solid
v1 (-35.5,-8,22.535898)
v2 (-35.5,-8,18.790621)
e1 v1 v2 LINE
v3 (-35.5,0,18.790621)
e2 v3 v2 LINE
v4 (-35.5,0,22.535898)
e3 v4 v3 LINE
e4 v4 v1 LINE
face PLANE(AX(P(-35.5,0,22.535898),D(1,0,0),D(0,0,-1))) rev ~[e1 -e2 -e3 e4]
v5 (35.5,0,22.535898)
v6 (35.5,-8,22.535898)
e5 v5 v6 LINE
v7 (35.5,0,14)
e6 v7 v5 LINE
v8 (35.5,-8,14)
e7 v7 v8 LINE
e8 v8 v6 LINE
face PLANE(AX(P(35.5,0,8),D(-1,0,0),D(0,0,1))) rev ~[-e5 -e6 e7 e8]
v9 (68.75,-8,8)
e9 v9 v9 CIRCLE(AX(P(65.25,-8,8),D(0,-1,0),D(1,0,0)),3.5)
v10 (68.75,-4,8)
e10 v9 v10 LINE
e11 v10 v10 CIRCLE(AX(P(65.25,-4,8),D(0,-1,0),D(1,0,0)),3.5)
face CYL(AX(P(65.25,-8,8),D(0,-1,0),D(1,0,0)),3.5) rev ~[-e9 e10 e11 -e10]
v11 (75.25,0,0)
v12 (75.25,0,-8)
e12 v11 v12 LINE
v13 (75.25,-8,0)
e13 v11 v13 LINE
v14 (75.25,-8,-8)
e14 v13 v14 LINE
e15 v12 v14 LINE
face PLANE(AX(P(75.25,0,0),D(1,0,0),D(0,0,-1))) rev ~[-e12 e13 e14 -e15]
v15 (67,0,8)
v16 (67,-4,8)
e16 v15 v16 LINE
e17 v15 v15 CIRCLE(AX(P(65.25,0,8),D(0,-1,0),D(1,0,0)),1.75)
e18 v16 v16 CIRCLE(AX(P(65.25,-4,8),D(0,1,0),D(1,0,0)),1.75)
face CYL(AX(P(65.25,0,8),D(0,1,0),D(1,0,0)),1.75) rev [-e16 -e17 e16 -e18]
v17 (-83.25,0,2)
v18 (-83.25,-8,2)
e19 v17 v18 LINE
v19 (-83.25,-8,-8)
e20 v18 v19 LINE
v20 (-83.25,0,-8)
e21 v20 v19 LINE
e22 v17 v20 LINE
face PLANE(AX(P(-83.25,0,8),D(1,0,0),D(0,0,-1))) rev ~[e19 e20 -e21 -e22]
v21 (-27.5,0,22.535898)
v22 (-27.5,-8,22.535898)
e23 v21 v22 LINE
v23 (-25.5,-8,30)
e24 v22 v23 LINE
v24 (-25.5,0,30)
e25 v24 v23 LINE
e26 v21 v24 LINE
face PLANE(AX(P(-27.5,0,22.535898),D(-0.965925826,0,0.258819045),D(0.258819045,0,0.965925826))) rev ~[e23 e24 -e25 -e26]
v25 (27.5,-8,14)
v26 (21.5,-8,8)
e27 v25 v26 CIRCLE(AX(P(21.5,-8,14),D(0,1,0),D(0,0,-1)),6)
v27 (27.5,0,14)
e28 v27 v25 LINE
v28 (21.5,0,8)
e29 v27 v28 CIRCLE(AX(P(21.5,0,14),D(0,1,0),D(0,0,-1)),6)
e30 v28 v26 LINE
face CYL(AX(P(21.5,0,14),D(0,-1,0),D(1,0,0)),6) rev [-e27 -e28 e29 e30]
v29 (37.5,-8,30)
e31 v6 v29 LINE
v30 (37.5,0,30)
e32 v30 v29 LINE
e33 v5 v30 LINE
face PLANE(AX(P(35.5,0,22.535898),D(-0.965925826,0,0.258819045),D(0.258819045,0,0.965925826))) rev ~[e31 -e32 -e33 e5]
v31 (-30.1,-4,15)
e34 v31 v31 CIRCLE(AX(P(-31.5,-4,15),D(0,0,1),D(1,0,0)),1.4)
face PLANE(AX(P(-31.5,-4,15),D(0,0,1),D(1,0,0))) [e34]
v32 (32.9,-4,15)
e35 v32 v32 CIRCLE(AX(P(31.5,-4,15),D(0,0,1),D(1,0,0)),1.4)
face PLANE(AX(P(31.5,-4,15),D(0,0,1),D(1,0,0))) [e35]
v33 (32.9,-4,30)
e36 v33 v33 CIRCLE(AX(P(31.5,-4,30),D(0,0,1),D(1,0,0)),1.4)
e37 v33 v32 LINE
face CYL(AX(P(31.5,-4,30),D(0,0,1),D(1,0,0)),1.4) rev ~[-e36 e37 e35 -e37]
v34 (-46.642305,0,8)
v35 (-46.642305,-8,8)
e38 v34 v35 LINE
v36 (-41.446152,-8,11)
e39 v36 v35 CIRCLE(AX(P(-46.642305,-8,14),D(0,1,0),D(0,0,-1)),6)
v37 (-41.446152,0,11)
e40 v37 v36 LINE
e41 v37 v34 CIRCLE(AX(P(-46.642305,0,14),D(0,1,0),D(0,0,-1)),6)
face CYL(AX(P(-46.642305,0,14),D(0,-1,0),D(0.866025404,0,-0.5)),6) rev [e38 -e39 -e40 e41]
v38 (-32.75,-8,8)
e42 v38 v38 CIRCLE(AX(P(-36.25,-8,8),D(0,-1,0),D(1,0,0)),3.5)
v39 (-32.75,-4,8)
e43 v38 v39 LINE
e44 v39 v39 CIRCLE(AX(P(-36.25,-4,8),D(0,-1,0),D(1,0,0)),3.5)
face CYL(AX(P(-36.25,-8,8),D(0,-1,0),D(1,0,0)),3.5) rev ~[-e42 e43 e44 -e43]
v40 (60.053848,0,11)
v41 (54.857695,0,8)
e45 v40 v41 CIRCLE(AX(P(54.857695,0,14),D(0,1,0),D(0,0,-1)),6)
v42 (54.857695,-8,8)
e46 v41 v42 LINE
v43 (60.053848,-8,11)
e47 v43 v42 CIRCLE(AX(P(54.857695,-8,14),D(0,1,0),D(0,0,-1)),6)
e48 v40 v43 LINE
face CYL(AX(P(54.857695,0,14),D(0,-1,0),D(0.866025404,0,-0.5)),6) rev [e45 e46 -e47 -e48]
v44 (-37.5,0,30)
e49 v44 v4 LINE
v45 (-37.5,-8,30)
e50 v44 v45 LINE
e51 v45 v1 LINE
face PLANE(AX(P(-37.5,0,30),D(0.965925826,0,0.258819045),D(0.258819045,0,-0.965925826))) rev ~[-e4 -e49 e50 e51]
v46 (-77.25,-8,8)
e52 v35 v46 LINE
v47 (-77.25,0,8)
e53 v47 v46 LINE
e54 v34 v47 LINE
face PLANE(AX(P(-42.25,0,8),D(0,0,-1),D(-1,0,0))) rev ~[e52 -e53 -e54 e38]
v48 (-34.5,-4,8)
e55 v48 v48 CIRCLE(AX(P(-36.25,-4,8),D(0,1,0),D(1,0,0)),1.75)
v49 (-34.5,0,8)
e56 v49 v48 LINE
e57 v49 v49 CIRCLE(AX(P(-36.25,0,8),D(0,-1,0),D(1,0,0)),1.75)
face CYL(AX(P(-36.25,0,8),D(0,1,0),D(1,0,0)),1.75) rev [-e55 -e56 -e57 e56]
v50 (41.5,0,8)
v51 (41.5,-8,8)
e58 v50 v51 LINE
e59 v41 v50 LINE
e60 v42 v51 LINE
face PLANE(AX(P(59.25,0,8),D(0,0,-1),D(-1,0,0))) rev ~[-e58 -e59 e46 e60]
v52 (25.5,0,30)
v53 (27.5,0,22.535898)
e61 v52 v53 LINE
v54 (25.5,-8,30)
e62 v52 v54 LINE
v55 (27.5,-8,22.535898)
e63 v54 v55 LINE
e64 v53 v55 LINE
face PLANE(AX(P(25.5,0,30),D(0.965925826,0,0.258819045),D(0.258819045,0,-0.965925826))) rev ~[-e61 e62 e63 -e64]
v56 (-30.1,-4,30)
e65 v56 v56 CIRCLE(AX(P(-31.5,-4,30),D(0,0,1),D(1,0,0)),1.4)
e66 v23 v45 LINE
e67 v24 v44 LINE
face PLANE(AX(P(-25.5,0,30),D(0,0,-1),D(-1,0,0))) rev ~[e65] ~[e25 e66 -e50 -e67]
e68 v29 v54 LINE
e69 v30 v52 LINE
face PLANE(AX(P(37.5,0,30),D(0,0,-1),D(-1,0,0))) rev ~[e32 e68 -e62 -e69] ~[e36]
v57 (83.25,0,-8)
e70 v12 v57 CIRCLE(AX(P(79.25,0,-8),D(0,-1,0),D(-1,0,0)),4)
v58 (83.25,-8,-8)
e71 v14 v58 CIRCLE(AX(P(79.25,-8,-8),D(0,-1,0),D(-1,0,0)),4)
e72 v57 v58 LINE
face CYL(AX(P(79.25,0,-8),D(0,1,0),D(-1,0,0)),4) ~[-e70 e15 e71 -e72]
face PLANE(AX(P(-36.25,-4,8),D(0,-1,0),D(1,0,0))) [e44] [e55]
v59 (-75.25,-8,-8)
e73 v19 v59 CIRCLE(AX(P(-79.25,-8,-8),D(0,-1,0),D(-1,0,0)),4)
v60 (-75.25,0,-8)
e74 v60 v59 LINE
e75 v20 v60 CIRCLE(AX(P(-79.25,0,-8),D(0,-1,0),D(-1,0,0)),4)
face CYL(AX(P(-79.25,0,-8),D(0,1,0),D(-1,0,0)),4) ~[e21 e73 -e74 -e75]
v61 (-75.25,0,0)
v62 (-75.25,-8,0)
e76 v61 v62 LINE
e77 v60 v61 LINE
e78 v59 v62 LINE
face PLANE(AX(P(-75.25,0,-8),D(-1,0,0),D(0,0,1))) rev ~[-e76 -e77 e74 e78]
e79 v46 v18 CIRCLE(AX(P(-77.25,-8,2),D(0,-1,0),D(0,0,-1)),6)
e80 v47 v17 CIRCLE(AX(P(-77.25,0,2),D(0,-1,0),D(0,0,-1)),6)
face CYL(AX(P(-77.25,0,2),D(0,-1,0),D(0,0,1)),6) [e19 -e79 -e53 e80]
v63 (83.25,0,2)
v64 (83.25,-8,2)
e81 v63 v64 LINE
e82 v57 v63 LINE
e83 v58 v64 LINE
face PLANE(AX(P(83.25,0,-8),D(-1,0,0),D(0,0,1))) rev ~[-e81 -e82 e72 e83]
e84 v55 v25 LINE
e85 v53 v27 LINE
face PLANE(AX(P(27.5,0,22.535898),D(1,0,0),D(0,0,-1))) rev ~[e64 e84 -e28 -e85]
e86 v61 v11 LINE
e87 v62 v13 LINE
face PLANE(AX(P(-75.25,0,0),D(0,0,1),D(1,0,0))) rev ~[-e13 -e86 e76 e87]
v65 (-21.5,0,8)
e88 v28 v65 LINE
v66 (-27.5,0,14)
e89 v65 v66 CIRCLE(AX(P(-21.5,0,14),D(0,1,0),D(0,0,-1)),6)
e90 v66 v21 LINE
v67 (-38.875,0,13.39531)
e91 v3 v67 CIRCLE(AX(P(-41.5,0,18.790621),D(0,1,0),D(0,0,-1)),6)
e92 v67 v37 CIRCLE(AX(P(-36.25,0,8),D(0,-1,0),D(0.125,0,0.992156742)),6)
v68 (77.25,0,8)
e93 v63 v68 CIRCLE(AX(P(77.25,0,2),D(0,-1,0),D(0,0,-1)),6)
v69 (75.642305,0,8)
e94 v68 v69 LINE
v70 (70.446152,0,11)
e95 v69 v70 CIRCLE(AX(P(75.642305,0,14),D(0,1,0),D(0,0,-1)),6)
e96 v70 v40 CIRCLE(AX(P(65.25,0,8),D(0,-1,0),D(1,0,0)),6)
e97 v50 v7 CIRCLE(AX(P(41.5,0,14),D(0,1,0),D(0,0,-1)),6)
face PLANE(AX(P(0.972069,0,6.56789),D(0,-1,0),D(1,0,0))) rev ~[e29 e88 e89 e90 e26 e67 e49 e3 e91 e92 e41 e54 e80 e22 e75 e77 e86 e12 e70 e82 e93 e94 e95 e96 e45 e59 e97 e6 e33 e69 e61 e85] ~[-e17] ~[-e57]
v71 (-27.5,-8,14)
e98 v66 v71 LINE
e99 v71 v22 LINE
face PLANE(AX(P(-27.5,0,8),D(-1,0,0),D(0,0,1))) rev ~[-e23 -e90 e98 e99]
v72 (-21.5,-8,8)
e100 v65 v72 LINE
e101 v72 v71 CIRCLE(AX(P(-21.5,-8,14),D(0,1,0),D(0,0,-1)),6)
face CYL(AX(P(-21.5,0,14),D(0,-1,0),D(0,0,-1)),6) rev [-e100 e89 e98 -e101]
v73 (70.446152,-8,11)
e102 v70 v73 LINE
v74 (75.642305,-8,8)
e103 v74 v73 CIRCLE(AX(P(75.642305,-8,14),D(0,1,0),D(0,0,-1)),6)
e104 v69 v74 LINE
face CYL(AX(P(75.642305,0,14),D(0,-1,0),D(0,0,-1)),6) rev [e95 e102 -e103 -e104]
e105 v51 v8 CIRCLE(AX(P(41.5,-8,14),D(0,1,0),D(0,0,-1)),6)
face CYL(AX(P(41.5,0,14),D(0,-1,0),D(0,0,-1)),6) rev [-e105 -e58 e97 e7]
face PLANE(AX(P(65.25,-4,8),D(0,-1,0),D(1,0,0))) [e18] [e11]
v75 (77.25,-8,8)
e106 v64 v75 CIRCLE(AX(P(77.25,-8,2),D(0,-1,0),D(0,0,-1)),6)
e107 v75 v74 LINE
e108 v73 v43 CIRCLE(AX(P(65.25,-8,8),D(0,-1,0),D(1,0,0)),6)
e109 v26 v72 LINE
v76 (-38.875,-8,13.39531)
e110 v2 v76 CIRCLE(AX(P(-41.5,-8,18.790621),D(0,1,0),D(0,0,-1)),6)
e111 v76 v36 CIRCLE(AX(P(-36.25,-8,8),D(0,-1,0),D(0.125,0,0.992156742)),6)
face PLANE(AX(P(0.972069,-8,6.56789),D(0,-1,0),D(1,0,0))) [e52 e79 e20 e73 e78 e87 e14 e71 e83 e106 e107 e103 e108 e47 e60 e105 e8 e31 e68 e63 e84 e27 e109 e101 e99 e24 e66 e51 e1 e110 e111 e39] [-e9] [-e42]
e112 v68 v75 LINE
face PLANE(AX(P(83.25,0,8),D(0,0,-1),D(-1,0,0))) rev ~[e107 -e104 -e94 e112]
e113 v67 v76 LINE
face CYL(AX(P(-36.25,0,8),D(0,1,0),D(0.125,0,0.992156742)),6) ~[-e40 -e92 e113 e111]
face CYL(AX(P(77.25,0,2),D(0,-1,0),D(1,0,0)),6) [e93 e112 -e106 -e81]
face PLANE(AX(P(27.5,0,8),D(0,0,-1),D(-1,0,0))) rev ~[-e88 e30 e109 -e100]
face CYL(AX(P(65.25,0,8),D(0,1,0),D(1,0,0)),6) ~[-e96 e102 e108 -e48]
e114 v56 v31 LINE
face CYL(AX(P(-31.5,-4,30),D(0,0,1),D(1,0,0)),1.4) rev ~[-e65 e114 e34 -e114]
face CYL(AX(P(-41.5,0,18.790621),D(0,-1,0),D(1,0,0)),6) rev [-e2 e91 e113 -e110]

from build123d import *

# Parameters (mm, degrees)
F0_R     = 1.75
F1_DEPTH = 8
F2_R     = 6
F3_R     = 3.5
F4_DEPTH = 4
F5_R     = 1.4
F6_DEPTH = 15
F7_R     = 1.4
F8_DEPTH = 15


# Not quite as in the source:
# - a feature names something its author has since deleted; it is built from what else it names


with BuildPart() as f1:
    # F0 (on Front) → F1 (new body)
    with BuildSketch(Plane.XZ):
        with BuildLine():
            Line((-75.25, 0), (0, 0))
            Line((0, 0), (75.25, 0))
            Line((75.25, 0), (75.25, -8))
            ThreePointArc((75.25, -8), (79.25, -12), (83.25, -8))
            Line((83.25, -8), (83.25, 8))
            Line((83.25, 8), (71.25, 8))
            ThreePointArc((71.25, 8), (65.25, 14), (59.25, 8))
            Line((59.25, 8), (35.5, 8))
            Line((35.5, 8), (35.5, 22.5358983849))
            Line((35.5, 22.5358983849), (35.5, 30))
            Line((35.5, 30), (27.5, 30))
            Line((27.5, 30), (27.5, 22.5358983849))
            Line((27.5, 22.5358983849), (27.5, 8))
            Line((27.5, 8), (0, 8))
            Line((0, 8), (-27.5, 8))
            Line((-27.5, 8), (-27.5, 22.5358983849))
            Line((-27.5, 22.5358983849), (-27.5, 30))
            Line((-27.5, 30), (-35.5, 30))
            Line((-35.5, 30), (-35.5, 22.5358983849))
            Line((-35.5, 22.5358983849), (-35.5, 13.9529404499))
            ThreePointArc((-35.5, 13.9529404499), (-40.2186269666, 12.5), (-42.25, 8))
            Line((-42.25, 8), (-83.25, 8))
            Line((-83.25, 8), (-83.25, -8))
            ThreePointArc((-83.25, -8), (-79.25, -12), (-75.25, -8))
            Line((-75.25, -8), (-75.25, 0))
        make_face()
        with Locations((-36.25, 8)):
            Circle(F0_R, mode=Mode.SUBTRACT)
        with Locations((65.25, 8)):
            Circle(F0_R, mode=Mode.SUBTRACT)
        Polygon((-37.5, 30), (-35.5, 22.5358983849), (-35.5, 30), align=None)
        Polygon((-25.5, 30), (-27.5, 30), (-27.5, 22.5358983849), align=None)
        Polygon((27.5, 22.5358983849), (27.5, 30), (25.5, 30), align=None)
        Polygon((35.5, 30), (35.5, 22.5358983849), (37.5, 30), align=None)
    extrude(amount=F1_DEPTH)

    # F2
    f2_edges = [f1.edges().sort_by_distance(p)[0] for p in [
        (59.25, -4, 8),
        (71.25, -4, 8),
        (83.25, -4, 8),
        (-83.25, -4, 8),
        (-35.5, -4, 13.95294),
        (-27.5, -4, 8),
        (27.5, -4, 8),
        (35.5, -4, 8),
        (-42.25, -4, 8),
    ]]
    fillet(f2_edges, radius=F2_R)

    # F3 (on face) → F4 (cut)
    with BuildSketch(Plane.XZ.offset(8)):
        with Locations((-36.25, 8)):
            Circle(F3_R)
        with Locations((65.25, 8)):
            Circle(F3_R)
    extrude(amount=-F4_DEPTH, mode=Mode.SUBTRACT)

    # F5 (on face) → F6 (cut)
    with BuildSketch(Plane.XY.offset(30)):
        with Locations((-31.5, -4)):
            Circle(F5_R)
    extrude(amount=-F6_DEPTH, mode=Mode.SUBTRACT)

    # F7 (on face) → F8 (cut)
    with BuildSketch(Plane.XY.offset(30)):
        with Locations((31.5, -4)):
            Circle(F7_R)
    extrude(amount=-F8_DEPTH, mode=Mode.SUBTRACT)


solid = f1.part
